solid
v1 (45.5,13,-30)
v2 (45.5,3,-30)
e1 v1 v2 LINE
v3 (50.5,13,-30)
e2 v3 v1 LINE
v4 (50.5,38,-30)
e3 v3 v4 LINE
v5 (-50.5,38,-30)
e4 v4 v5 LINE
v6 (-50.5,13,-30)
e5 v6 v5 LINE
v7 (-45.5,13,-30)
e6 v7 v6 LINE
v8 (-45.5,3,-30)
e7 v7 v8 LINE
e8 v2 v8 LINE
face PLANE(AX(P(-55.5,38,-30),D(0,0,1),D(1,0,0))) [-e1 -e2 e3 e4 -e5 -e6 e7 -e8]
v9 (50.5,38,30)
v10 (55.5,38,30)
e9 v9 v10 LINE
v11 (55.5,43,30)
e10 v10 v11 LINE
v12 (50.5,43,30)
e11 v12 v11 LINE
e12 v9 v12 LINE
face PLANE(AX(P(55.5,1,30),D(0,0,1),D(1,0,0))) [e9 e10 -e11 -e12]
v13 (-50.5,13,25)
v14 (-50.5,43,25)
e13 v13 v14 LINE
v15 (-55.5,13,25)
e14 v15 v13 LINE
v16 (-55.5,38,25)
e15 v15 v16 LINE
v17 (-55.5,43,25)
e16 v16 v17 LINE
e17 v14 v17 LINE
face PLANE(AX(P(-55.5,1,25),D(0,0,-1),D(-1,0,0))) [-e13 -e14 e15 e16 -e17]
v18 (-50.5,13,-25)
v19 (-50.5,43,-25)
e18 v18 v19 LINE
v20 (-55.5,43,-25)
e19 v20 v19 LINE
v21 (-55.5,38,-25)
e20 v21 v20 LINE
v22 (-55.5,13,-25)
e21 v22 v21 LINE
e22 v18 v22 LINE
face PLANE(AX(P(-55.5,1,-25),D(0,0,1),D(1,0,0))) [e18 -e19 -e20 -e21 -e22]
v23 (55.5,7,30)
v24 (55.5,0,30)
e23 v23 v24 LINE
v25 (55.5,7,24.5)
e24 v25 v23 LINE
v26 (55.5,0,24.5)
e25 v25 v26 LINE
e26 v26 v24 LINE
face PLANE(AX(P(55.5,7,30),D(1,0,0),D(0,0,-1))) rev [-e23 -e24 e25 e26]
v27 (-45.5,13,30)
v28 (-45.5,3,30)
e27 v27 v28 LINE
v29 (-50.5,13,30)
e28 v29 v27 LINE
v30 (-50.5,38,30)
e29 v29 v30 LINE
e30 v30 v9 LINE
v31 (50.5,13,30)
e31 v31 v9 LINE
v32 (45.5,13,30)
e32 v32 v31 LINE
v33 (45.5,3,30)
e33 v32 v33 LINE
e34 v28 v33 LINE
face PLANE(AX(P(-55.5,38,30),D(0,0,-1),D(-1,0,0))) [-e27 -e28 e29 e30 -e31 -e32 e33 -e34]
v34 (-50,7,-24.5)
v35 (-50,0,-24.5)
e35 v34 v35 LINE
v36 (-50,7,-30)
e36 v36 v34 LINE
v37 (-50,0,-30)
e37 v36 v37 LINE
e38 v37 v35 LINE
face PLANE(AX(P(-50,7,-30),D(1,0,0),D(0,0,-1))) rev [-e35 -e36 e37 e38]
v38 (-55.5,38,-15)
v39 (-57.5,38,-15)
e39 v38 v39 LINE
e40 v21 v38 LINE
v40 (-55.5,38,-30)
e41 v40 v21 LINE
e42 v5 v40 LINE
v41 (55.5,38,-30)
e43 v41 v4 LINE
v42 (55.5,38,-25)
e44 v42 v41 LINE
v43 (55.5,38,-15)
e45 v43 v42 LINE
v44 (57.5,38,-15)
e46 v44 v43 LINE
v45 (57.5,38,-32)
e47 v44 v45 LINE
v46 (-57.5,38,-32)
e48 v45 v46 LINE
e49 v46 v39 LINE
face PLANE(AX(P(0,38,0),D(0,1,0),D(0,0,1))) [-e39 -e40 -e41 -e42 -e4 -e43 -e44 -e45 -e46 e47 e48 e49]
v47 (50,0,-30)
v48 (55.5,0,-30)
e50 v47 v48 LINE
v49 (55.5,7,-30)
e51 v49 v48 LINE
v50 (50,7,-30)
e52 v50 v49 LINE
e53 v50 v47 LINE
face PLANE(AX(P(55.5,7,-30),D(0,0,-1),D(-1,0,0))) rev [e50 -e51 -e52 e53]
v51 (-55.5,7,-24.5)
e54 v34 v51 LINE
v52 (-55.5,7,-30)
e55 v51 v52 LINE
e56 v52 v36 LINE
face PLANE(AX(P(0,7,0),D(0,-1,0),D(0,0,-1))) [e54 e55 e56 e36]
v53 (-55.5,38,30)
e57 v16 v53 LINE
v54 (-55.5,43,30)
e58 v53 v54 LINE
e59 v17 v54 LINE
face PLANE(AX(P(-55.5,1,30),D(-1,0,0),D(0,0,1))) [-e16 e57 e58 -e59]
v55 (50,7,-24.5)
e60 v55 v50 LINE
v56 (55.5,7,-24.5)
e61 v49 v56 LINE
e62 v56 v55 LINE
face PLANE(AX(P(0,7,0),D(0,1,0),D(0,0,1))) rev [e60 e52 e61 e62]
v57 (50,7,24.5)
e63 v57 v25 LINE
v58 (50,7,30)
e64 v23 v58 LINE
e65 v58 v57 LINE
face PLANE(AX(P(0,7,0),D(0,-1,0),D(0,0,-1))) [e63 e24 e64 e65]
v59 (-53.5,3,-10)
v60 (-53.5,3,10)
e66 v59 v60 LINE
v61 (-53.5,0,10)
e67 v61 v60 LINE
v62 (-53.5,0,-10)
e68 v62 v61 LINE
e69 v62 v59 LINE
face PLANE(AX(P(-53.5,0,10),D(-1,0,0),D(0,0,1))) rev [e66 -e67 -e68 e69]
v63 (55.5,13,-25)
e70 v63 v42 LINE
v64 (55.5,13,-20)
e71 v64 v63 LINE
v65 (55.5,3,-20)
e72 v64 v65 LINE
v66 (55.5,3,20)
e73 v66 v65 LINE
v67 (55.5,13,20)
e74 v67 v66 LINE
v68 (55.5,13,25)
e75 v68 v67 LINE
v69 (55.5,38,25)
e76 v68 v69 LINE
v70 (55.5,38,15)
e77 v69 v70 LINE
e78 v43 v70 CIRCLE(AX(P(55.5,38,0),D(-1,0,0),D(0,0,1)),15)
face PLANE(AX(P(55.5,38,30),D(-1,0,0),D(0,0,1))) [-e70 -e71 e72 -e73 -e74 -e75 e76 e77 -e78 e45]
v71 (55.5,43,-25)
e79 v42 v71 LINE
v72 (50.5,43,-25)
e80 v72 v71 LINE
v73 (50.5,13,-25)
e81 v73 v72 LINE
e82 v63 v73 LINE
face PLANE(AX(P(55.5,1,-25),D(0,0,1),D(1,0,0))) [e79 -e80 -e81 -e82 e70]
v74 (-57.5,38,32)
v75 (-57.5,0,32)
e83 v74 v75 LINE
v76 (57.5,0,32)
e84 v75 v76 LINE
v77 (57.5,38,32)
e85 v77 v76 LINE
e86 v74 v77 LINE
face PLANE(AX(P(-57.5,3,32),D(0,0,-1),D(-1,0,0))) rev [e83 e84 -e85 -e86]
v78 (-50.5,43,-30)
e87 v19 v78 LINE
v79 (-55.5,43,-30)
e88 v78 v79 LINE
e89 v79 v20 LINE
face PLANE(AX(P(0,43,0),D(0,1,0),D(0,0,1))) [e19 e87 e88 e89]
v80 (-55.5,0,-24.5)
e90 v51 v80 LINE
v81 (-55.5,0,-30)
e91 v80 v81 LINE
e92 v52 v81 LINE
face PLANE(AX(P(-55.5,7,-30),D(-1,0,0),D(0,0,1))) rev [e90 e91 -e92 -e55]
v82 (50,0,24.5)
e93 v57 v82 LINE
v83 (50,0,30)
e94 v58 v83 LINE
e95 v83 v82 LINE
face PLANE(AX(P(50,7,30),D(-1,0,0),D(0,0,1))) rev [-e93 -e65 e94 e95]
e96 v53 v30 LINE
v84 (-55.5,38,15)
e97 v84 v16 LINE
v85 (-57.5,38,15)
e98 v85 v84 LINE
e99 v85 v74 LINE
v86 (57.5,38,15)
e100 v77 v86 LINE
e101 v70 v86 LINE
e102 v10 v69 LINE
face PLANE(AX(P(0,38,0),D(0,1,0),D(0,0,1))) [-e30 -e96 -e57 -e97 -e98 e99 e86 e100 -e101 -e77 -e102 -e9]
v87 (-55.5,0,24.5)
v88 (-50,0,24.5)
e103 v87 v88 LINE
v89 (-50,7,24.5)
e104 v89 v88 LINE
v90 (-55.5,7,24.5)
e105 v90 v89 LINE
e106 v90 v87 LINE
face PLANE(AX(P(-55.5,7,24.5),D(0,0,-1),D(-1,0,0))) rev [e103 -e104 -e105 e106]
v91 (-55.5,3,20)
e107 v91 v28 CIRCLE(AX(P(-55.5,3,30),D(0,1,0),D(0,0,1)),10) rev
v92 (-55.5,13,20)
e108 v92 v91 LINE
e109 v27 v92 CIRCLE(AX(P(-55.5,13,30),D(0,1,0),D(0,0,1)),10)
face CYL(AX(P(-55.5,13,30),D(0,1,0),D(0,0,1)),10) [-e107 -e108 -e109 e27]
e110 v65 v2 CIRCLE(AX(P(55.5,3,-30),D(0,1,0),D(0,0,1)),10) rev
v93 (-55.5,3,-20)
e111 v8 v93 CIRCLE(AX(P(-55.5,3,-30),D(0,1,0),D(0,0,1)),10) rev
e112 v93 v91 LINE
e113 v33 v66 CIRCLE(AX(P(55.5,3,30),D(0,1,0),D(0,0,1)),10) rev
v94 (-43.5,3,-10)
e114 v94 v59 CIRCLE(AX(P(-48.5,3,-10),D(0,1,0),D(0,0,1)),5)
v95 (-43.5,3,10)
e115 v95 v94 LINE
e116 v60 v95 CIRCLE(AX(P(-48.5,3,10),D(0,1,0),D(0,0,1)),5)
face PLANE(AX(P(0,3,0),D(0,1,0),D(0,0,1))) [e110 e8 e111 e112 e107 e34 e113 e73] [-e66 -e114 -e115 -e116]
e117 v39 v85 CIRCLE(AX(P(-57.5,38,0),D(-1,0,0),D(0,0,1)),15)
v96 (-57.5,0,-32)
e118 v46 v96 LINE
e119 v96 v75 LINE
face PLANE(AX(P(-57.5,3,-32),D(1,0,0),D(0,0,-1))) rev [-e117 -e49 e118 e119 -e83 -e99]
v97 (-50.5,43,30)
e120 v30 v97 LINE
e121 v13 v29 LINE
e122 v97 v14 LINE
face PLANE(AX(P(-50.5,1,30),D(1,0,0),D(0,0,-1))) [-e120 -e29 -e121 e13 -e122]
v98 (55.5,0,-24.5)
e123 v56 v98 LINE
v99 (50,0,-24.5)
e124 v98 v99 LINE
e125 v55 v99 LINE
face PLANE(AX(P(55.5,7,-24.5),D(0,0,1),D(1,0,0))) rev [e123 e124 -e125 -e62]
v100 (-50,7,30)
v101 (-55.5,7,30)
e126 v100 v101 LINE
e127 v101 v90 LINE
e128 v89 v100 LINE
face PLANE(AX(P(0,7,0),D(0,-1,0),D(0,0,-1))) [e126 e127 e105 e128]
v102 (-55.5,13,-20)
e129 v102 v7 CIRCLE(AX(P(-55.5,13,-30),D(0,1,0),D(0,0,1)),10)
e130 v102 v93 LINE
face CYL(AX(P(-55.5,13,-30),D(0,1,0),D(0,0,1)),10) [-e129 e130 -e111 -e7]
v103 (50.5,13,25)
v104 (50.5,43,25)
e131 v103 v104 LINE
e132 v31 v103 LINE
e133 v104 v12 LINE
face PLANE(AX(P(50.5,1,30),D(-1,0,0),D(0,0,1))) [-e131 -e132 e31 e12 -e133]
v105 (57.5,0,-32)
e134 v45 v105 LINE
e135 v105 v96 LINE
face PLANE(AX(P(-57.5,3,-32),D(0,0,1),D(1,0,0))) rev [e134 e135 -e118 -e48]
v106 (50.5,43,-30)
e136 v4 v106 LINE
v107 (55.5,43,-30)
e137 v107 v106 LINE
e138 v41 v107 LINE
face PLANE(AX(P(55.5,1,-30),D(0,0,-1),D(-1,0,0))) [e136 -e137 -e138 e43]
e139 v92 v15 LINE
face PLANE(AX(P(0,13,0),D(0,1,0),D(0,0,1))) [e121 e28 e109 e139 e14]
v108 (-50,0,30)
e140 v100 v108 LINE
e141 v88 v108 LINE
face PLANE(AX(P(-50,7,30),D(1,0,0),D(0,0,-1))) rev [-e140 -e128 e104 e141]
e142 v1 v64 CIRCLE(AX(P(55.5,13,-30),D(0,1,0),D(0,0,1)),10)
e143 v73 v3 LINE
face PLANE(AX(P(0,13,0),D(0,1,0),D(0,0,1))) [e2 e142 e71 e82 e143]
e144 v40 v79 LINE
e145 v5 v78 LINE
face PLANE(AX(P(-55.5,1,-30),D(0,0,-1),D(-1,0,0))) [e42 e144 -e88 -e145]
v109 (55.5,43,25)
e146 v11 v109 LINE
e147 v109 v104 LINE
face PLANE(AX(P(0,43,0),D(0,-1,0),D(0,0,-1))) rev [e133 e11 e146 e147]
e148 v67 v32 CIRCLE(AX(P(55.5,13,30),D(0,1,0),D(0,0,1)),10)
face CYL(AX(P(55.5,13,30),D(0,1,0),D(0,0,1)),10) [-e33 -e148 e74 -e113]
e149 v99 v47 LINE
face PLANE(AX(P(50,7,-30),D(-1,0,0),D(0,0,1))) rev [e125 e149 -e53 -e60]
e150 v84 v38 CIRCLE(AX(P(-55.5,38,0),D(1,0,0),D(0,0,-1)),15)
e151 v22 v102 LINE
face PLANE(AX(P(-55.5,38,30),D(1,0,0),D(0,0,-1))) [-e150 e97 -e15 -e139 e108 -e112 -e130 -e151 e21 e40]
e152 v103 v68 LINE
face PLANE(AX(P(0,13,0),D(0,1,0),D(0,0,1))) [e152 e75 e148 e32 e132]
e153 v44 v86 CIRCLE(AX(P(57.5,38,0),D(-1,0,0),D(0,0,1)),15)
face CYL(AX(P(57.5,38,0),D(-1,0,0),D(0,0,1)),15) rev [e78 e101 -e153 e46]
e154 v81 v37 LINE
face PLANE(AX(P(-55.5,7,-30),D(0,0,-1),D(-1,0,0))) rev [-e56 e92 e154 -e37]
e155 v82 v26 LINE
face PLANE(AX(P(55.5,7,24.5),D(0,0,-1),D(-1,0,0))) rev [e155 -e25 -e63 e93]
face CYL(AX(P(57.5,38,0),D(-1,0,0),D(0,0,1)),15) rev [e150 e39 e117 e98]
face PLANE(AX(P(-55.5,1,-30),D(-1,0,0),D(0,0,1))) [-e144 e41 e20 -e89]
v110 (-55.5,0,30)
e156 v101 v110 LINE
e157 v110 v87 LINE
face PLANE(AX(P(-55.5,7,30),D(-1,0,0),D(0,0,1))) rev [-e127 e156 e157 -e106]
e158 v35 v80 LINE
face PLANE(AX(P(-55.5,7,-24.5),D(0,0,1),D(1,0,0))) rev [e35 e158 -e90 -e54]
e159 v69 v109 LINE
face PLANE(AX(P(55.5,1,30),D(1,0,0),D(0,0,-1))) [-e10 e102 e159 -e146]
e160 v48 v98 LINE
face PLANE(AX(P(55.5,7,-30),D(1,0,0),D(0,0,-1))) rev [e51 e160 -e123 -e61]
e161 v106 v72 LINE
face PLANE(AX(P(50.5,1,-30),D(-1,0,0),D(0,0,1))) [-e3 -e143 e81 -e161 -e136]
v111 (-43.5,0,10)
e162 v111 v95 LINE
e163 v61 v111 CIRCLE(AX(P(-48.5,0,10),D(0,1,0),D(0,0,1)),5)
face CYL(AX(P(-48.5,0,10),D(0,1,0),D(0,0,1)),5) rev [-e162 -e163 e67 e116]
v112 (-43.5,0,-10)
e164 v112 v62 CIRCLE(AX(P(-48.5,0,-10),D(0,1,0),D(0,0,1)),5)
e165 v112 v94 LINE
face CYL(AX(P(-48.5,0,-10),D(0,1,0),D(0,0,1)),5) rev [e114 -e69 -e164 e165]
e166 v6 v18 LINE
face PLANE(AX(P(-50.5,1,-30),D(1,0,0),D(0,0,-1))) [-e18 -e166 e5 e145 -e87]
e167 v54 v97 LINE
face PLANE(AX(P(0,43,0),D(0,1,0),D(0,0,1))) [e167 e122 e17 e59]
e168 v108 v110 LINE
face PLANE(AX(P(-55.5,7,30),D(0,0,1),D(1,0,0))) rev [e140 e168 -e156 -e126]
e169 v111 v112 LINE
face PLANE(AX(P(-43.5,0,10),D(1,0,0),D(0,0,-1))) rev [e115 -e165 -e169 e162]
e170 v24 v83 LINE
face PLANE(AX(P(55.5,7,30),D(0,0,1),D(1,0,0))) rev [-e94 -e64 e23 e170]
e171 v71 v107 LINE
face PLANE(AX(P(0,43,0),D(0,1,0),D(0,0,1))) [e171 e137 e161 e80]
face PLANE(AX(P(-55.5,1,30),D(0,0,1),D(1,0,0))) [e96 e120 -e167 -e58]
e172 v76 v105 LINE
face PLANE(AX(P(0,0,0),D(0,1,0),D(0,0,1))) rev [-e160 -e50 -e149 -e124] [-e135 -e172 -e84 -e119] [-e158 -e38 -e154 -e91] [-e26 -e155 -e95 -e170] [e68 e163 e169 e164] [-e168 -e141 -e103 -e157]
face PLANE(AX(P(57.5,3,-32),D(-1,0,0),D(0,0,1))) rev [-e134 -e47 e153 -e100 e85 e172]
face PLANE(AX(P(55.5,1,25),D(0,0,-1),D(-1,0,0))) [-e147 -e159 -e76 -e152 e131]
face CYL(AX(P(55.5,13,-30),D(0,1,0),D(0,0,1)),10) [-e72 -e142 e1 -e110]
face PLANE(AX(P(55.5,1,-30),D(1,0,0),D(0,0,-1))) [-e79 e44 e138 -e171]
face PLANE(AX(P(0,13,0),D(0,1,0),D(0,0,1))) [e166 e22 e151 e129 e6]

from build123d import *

# Parameters (mm, degrees)
SKETCH1_W                = 115
SKETCH1_H                = 64
BOSS_EXTRUDE1_DEPTH      = 3
SKETCH2_W                = 115
SKETCH2_H                = 64
SKETCH2_W_2              = 111
SKETCH2_H_2              = 60
BOSS_EXTRUDE2_DEPTH      = 35
BOSS_EXTRUDE9_DEPTH      = 5
BOSS_EXTRUDE9_DEPTH_BACK = 37
SKETCH12_W               = 5
SKETCH12_H               = 5
CUT_EXTRUDE6_DEPTH       = 78.008116455
BOSS_EXTRUDE11_DEPTH     = 10
SKETCH19_W               = 5.5
SKETCH19_H               = 5.5
CUT_EXTRUDE7_DEPTH       = 7
FILLET2_R                = 10
SKETCH20_R               = 15
CUT_EXTRUDE8_DEPTH       = 127.877894056


with BuildPart() as part:
    # Sketch1 → Boss-Extrude1 (new body)
    with BuildSketch(Plane(origin=(0, 0, 0), x_dir=(1, 0, 0), z_dir=(0, 1, 0))):
        Rectangle(SKETCH1_W, SKETCH1_H)
    extrude(amount=BOSS_EXTRUDE1_DEPTH)

    # Sketch2 → Boss-Extrude2 (add)
    with BuildSketch(Plane(origin=(0, 3, 0), x_dir=(1, 0, 0), z_dir=(0, 1, 0))):
        Rectangle(SKETCH2_W, SKETCH2_H)
        Rectangle(SKETCH2_W_2, SKETCH2_H_2, mode=Mode.SUBTRACT)
    extrude(amount=BOSS_EXTRUDE2_DEPTH)

    # Sketch12 → Boss-Extrude9 (add, two sides: drawn at the far end of the back side and taken through both)
    with BuildSketch(Plane(origin=(0, 38, 0), x_dir=(1, 0, 0), z_dir=(0, 1, 0)).offset(-BOSS_EXTRUDE9_DEPTH_BACK)):
        with Locations((-53, 27.5)):
            Rectangle(SKETCH12_W, SKETCH12_H)
        with Locations((53, 27.5)):
            Rectangle(SKETCH12_W, SKETCH12_H)
        with Locations((53, -27.5)):
            Rectangle(SKETCH12_W, SKETCH12_H)
        with Locations((-53, -27.5)):
            Rectangle(SKETCH12_W, SKETCH12_H)
    extrude(amount=BOSS_EXTRUDE9_DEPTH + BOSS_EXTRUDE9_DEPTH_BACK)

    # Sketch14 → Cut-Extrude6 (cut, through all)
    with BuildSketch(Plane(origin=(0, 3, 0), x_dir=(1, 0, 0), z_dir=(0, 1, 0))):
        with BuildLine():
            Line((-53.5, -10), (-53.5, 10))
            ThreePointArc((-53.5, 10), (-48.5, 15), (-43.5, 10))
            Line((-43.5, 10), (-43.5, -10))
            ThreePointArc((-43.5, -10), (-48.5, -15), (-53.5, -10))
        make_face()
    extrude(amount=-CUT_EXTRUDE6_DEPTH, mode=Mode.SUBTRACT)

    # Sketch17 → Boss-Extrude11 (add)
    with BuildSketch(Plane(origin=(0, 3, 0), x_dir=(1, 0, 0), z_dir=(0, 1, 0))):
        Polygon((-45.5, 30), (-50.5, 30), (-50.5, 25), (-55.5, 25), (-55.5, 20), (-45.5, 20), align=None)
        Polygon((50.5, 30), (45.5, 30), (45.5, 20), (55.5, 20), (55.5, 25), (50.5, 25), align=None)
        Polygon((55.5, -25), (55.5, -20), (45.5, -20), (45.5, -30), (50.5, -30), (50.5, -25), align=None)
        Polygon((-45.5, -20), (-55.5, -20), (-55.5, -25), (-50.5, -25), (-50.5, -30), (-45.5, -30), align=None)
    extrude(amount=BOSS_EXTRUDE11_DEPTH)

    # Sketch19 → Cut-Extrude7 (cut)
    with BuildSketch(Plane.XZ):
        with Locations((-52.75, 27.25)):
            Rectangle(SKETCH19_W, SKETCH19_H)
        with Locations((52.75, 27.25)):
            Rectangle(SKETCH19_W, SKETCH19_H)
        with Locations((52.75, -27.25)):
            Rectangle(SKETCH19_W, SKETCH19_H)
        with Locations((-52.75, -27.25)):
            Rectangle(SKETCH19_W, SKETCH19_H)
    extrude(amount=-CUT_EXTRUDE7_DEPTH, mode=Mode.SUBTRACT)

    # Fillet2
    fillet2_edges = [part.edges().sort_by_distance(p)[0] for p in [
        (-45.5, 8, 20),
        (45.5, 8, -20),
        (45.5, 8, 20),
        (-45.5, 8, -20),
    ]]
    fillet(fillet2_edges, radius=FILLET2_R - 0.0001)  # a hair under: the kernel refuses the full size

    # Sketch20 → Cut-Extrude8 (cut, through all)
    with BuildSketch(Plane.ZY.offset(57.5)):
        with Locations((0, 38)):
            Circle(SKETCH20_R)
    extrude(amount=-CUT_EXTRUDE8_DEPTH, mode=Mode.SUBTRACT)


solid = part.part
